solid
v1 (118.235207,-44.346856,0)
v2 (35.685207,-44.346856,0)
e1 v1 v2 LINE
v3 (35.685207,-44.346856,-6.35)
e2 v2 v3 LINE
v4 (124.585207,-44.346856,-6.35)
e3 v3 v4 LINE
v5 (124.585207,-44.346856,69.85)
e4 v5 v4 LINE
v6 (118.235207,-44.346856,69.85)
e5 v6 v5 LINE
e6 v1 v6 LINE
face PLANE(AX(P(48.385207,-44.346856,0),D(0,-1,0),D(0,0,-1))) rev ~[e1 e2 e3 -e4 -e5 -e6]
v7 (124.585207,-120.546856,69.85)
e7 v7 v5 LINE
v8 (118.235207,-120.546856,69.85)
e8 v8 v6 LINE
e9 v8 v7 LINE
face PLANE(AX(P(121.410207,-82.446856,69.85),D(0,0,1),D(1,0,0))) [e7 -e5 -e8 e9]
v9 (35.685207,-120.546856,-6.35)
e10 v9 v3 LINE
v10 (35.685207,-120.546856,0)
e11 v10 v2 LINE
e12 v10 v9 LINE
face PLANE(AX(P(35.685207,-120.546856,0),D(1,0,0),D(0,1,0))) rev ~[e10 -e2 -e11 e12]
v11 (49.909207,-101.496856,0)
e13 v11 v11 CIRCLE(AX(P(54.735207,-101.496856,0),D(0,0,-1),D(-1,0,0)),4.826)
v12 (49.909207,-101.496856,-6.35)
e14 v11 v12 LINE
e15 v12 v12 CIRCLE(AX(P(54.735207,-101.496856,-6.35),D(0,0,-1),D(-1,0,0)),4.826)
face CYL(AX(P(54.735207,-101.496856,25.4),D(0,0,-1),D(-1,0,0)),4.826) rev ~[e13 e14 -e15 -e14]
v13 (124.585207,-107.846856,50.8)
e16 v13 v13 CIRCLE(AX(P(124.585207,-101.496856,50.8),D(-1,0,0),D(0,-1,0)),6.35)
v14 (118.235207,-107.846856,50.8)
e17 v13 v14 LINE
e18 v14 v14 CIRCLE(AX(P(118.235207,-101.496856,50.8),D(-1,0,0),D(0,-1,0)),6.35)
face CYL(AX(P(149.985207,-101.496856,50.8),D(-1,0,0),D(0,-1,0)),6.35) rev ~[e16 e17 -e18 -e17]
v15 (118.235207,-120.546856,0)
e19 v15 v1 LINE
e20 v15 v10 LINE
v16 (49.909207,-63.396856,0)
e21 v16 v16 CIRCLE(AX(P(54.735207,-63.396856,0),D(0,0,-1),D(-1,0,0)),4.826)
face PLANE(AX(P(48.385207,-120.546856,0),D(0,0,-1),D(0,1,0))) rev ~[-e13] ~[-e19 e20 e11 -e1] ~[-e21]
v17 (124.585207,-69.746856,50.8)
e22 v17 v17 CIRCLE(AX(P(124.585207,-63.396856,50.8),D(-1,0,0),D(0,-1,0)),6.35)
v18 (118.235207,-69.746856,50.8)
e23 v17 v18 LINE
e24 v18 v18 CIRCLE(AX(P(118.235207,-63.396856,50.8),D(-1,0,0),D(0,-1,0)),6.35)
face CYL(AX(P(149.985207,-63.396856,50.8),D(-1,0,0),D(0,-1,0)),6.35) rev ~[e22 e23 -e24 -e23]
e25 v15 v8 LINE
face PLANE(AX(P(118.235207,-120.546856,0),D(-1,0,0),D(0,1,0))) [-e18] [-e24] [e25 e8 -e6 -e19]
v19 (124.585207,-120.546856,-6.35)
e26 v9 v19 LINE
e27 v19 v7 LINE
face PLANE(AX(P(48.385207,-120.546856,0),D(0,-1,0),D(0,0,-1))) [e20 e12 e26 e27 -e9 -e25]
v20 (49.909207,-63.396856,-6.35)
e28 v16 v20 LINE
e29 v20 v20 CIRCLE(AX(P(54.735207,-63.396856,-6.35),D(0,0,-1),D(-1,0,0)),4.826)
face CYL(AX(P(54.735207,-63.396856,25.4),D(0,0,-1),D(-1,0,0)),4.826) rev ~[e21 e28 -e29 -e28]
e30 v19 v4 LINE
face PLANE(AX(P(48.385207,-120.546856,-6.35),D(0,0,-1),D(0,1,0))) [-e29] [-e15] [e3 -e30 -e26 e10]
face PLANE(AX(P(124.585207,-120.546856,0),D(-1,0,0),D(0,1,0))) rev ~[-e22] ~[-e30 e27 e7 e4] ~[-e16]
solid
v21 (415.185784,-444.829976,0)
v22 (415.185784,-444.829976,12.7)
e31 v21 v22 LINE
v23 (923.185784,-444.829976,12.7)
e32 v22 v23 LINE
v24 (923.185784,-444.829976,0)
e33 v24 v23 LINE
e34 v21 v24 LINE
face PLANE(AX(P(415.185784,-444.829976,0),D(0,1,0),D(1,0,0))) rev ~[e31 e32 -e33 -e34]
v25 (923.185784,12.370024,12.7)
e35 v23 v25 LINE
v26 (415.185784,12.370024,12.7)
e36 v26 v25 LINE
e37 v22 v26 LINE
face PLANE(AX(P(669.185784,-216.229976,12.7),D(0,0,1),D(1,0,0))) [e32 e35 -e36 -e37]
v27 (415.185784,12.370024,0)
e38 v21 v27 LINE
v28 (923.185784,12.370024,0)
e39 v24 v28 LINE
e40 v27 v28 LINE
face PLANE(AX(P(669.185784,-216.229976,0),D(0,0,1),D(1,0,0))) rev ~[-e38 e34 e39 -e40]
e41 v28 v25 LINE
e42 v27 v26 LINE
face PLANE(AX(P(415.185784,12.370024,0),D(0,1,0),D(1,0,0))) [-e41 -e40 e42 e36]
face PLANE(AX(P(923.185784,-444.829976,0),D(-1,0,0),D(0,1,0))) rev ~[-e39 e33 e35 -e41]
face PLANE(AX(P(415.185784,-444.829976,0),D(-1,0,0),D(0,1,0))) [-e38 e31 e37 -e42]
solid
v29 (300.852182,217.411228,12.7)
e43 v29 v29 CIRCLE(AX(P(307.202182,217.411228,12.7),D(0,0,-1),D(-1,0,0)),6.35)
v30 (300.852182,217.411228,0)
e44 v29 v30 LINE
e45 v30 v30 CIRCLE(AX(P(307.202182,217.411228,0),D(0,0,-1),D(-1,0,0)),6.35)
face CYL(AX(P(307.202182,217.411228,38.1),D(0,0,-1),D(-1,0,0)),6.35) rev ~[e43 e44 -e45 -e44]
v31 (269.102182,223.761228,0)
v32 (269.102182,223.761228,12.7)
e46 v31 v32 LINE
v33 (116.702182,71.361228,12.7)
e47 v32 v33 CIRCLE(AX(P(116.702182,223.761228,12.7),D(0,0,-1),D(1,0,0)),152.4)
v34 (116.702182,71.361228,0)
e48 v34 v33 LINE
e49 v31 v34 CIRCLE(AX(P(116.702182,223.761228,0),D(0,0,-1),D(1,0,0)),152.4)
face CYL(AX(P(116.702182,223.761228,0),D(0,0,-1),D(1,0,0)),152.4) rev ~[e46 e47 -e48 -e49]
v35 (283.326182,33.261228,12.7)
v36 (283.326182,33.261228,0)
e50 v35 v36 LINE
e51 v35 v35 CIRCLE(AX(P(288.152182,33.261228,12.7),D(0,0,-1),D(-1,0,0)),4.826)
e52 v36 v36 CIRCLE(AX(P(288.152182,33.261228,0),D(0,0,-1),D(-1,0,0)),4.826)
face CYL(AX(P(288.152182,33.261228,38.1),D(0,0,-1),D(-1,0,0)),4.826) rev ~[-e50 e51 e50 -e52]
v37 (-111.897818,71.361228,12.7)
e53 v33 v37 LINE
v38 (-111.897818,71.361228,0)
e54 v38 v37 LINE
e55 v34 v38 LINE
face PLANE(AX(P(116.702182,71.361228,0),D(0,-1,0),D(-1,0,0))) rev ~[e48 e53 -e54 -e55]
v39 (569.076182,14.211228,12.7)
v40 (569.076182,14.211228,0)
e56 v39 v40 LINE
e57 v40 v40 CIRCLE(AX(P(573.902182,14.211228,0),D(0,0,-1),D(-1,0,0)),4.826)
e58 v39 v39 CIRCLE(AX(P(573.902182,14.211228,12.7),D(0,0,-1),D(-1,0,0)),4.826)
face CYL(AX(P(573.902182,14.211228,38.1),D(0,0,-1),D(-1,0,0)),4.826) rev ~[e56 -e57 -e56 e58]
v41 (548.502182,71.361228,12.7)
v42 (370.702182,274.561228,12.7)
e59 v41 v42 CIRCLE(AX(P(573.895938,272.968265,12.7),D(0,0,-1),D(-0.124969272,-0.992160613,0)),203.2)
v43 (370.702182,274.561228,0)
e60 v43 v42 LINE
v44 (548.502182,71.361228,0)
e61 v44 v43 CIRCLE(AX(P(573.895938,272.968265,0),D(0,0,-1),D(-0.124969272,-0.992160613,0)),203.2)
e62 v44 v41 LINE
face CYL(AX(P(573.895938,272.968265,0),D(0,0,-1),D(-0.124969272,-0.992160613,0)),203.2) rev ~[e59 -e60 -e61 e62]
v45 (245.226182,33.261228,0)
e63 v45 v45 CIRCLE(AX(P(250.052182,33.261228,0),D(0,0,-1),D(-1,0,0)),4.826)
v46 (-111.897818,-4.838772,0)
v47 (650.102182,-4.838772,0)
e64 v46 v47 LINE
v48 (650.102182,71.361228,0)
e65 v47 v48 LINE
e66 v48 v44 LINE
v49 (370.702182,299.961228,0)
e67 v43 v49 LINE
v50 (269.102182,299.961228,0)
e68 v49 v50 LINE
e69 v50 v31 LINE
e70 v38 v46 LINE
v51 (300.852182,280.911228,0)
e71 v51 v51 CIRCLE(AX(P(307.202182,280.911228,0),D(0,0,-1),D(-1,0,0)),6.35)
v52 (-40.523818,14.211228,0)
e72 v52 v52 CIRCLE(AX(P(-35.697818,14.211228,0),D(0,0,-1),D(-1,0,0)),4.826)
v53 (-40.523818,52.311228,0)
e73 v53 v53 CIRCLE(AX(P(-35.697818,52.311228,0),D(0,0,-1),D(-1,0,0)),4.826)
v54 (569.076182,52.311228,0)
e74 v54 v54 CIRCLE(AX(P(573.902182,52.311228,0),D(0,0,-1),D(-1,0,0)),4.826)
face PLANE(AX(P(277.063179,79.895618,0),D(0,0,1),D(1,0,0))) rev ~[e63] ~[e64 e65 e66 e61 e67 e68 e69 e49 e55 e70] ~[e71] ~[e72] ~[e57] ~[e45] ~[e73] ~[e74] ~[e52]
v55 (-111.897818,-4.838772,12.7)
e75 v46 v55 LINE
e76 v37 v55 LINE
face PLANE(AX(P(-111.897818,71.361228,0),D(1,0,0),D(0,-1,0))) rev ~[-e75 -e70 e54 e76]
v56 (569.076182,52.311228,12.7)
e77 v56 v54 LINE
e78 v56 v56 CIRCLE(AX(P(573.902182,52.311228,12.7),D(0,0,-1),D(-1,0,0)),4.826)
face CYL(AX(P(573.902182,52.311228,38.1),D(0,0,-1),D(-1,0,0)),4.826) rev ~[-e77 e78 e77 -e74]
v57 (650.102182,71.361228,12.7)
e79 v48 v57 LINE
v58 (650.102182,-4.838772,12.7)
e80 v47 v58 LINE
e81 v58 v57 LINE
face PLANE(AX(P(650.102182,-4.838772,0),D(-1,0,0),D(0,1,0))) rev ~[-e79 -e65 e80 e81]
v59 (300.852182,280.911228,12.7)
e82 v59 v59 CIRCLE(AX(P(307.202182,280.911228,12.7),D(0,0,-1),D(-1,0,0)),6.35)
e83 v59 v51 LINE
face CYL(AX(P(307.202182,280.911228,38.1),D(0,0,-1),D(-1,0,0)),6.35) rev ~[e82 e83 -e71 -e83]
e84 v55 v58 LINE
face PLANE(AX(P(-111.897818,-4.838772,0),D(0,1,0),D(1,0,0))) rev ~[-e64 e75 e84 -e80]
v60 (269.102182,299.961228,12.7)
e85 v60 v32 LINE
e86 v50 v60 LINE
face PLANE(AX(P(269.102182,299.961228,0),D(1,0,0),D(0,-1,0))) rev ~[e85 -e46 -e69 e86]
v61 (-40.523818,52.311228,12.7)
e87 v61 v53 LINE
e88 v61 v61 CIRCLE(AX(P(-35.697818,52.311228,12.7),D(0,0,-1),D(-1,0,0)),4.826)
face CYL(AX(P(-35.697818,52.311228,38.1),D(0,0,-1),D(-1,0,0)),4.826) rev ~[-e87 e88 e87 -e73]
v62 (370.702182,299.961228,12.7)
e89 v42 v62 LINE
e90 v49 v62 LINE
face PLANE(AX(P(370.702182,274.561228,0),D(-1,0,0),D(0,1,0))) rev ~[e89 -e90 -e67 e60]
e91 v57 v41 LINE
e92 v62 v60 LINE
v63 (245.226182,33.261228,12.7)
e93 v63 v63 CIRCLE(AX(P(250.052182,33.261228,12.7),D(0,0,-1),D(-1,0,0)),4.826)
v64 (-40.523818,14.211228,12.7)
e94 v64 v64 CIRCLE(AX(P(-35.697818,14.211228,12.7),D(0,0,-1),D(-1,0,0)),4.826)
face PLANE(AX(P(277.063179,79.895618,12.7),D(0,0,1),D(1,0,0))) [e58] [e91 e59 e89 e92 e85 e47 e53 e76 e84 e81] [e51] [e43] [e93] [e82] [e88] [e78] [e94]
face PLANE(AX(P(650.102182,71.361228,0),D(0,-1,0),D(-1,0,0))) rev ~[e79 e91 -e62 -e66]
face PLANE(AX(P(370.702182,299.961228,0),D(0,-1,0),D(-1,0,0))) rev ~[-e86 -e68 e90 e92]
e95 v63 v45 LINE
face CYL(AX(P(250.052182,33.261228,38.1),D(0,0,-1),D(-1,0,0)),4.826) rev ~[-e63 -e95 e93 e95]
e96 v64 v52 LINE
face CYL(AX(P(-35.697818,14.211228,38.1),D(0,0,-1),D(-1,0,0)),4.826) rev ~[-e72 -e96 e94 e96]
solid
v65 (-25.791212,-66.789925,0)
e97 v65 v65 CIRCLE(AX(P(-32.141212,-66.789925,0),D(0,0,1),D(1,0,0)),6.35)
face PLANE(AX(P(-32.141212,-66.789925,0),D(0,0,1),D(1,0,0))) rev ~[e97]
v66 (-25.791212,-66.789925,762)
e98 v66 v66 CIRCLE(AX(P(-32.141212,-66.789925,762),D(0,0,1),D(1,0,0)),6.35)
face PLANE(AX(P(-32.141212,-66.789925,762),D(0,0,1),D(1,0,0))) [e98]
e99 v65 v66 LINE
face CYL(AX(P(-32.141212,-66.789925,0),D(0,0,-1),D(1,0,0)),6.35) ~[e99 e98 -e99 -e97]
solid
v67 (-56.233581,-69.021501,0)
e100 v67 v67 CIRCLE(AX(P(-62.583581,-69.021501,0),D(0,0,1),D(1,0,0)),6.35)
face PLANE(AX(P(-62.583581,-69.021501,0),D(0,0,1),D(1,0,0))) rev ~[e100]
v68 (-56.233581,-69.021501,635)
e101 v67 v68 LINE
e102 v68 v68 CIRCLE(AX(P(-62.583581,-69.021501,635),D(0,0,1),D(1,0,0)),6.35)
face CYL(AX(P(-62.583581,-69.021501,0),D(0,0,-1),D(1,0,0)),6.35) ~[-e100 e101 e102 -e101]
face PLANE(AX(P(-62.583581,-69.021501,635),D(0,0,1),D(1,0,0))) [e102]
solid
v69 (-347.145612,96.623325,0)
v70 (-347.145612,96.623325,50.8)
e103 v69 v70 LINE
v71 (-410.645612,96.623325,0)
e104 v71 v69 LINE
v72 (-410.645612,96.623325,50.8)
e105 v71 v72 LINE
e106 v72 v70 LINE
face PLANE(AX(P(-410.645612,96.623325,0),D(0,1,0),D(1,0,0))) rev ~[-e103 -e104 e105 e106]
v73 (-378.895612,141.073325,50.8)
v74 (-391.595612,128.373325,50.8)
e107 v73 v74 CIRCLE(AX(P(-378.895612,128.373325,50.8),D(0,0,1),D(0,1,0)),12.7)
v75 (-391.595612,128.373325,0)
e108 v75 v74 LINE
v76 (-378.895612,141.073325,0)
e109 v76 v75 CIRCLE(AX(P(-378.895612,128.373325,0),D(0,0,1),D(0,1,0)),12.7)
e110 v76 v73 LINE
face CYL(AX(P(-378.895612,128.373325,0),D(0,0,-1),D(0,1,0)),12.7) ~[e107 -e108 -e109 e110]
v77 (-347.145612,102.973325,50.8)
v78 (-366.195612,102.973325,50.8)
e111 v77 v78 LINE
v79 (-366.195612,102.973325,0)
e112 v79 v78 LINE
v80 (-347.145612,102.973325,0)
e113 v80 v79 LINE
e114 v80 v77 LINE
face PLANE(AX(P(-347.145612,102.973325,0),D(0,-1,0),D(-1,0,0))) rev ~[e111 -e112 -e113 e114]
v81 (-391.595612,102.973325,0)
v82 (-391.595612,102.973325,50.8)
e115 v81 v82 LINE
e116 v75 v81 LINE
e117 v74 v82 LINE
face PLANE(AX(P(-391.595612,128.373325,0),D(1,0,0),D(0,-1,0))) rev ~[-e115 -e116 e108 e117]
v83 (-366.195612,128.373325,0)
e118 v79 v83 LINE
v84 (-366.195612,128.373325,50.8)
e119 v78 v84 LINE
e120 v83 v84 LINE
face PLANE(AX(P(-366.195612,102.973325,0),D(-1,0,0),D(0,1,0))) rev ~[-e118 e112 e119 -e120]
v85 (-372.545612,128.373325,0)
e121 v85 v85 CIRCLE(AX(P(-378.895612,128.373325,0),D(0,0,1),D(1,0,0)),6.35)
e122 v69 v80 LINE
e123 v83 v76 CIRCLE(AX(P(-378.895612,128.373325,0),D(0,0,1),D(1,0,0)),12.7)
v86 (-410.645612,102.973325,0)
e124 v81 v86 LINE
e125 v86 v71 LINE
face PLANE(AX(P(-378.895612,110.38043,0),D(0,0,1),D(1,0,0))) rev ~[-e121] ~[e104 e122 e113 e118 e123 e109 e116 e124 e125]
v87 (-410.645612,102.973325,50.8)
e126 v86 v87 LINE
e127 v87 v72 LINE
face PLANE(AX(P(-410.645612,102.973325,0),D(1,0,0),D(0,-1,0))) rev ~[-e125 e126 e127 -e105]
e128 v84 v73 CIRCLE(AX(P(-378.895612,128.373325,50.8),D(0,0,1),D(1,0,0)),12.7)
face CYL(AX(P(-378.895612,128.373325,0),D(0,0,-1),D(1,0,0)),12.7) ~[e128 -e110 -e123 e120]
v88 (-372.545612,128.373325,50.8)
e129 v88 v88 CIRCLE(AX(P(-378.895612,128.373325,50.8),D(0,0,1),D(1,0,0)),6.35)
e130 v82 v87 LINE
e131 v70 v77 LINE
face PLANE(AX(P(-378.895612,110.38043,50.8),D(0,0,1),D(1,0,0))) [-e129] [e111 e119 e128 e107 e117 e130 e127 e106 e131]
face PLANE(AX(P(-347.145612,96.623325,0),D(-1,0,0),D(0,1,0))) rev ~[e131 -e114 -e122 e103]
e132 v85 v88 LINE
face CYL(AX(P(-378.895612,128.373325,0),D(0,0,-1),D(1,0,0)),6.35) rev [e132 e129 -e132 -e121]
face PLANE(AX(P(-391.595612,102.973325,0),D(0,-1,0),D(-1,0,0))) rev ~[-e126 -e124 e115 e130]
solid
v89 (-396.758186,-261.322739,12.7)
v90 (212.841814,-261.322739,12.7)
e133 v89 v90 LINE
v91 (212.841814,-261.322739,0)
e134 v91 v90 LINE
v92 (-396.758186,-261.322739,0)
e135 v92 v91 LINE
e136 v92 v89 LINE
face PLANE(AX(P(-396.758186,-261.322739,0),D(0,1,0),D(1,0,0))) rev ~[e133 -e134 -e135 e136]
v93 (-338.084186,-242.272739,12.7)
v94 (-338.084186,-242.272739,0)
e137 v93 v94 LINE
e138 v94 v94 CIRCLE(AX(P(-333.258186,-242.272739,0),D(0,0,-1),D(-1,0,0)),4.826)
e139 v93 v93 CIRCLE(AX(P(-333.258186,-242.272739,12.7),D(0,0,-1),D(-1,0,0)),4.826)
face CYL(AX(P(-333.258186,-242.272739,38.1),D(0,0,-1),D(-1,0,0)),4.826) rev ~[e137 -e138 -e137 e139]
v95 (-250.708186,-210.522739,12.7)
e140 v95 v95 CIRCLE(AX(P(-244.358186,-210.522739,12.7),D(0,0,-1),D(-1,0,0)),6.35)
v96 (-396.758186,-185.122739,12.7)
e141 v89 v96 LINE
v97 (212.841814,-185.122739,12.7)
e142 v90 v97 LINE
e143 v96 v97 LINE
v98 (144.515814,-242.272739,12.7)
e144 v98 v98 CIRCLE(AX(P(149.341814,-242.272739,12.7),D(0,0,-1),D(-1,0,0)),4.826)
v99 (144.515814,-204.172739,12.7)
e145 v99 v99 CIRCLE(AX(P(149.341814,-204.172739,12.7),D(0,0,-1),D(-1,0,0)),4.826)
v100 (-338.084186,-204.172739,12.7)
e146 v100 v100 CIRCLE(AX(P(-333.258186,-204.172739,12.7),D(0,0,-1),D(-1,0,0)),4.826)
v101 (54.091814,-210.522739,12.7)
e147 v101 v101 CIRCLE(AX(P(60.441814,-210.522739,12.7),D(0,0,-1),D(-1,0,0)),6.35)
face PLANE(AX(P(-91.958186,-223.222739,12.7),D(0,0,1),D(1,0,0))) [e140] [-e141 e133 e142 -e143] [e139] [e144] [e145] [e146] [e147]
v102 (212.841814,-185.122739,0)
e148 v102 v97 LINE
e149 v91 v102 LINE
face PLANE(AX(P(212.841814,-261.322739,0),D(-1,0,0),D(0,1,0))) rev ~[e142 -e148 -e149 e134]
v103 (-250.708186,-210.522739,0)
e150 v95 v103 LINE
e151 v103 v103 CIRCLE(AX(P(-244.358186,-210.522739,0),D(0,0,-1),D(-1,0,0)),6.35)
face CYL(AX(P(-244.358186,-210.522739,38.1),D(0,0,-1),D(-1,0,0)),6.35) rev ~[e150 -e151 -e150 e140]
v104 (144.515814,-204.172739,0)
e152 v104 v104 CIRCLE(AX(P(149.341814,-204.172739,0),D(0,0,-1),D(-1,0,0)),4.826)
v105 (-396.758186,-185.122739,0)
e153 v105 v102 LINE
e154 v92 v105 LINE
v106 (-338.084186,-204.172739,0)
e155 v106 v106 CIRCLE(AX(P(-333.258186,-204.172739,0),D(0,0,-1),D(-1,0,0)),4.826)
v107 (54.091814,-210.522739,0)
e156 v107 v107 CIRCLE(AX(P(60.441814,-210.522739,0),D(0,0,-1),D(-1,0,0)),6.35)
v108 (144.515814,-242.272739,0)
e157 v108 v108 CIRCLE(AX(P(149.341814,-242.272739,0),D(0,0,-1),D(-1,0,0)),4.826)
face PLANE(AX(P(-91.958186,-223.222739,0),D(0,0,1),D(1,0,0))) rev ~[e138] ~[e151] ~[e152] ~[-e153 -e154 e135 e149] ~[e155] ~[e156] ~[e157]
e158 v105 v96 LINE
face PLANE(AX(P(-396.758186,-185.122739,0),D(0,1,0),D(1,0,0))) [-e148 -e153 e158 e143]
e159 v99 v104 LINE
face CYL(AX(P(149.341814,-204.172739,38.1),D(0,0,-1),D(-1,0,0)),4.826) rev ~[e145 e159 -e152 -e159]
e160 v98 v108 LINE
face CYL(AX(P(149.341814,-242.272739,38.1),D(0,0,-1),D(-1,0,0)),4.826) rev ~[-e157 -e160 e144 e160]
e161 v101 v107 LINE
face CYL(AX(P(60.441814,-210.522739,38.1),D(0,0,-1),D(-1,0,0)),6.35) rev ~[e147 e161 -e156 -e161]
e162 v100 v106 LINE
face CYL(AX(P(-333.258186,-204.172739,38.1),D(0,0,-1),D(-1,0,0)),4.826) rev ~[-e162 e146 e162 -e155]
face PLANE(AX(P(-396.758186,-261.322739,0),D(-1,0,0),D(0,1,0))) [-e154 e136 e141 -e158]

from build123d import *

# Parameters (mm, degrees)
F0_W      = 609.6
F0_H      = 76.2
F1_DEPTH  = 12.7
F3_DEPTH  = 12.7
F5_D      = 9.652
F5_DEPTH  = 25.4
F5_TIP    = 2.8997533474
F7_D      = 9.652
F7_DEPTH  = 25.4
F7_TIP    = 2.8997533474
F8_D      = 9.652
F8_DEPTH  = 25.4
F8_TIP    = 2.8997533474
F10_D     = 9.652
F10_DEPTH = 25.4
F10_TIP   = 2.8997533474
F12_D     = 12.7
F12_DEPTH = 25.4
F12_TIP   = 3.8154649308
F13_R     = 6.35
F14_DEPTH = 635
F15_D     = 12.7
F15_DEPTH = 25.4
F15_TIP   = 3.8154649308
F16_R     = 6.35
F17_DEPTH = 762
F18_W     = 69.85
F18_H     = 76.2
F18_W_2   = 6.35
F19_DEPTH = 6.35
F20_DEPTH = 69.85
F22_D     = 12.7
F22_DEPTH = 25.4
F22_TIP   = 3.8154649308
F23_D     = 12.7
F23_DEPTH = 25.4
F23_TIP   = 3.8154649308
F24_W     = 508
F24_H     = 457.2
F25_DEPTH = 12.7
F26_R     = 6.35
F27_DEPTH = 50.8
F28_DEPTH = 12.7
F30_D     = 9.652
F30_DEPTH = 25.4
F30_TIP   = 2.8997533474


# Not quite as in the source:
# - a feature names something its author has since deleted; it is built from what else it names


with BuildPart() as f1:
    # F0 (on Top) → F1 (new body)
    with BuildSketch(Plane.XY):
        with Locations((-91.9581856579, -223.2227385089)):
            Rectangle(F0_W, F0_H)
    extrude(amount=F1_DEPTH)

    # F5
    with Locations(Plane.XY.offset(12.7)):
        with Locations((149.3418143421, -242.2727385089), (149.3418143421, -204.1727385089)):
            Hole(F5_D / 2, depth=F5_DEPTH)
            with Locations((0, 0, -(F5_DEPTH + F5_TIP / 2))):  # 118° drill point
                Cone(0, F5_D / 2, F5_TIP, mode=Mode.SUBTRACT)

    # F8
    with Locations(Plane.XY.offset(12.7)):
        with Locations((-333.2581856579, -204.1727385089), (-333.2581856579, -242.2727385089)):
            Hole(F8_D / 2, depth=F8_DEPTH)
            with Locations((0, 0, -(F8_DEPTH + F8_TIP / 2))):  # 118° drill point
                Cone(0, F8_D / 2, F8_TIP, mode=Mode.SUBTRACT)

    # F15
    with Locations(Plane.XY.offset(12.7)):
        with Locations((-244.3581856579, -210.5227385089), (60.4418143421, -210.5227385089)):
            Hole(F15_D / 2, depth=F15_DEPTH)
            with Locations((0, 0, -(F15_DEPTH + F15_TIP / 2))):  # 118° drill point
                Cone(0, F15_D / 2, F15_TIP, mode=Mode.SUBTRACT)


with BuildPart() as f3:
    # F2 (on Top) → F3 (new body)
    with BuildSketch(Plane.XY):
        with BuildLine():
            Line((116.7021817187, 71.3612283528), (-111.8978182813, 71.3612283528))
            Line((-111.8978182813, 71.3612283528), (-111.8978182813, -4.8387716472))
            Line((-111.8978182813, -4.8387716472), (650.1021817187, -4.8387716472))
            Line((650.1021817187, -4.8387716472), (650.1021817187, 71.3612283528))
            Line((650.1021817187, 71.3612283528), (548.5021817187, 71.3612283528))
            ThreePointArc((548.5021817187, 71.3612283528), (420.9723533293, 139.160128512), (370.7021817187, 274.5612283528))
            Line((370.7021817187, 274.5612283528), (370.7021817187, 299.9612283528))
            Line((370.7021817187, 299.9612283528), (269.1021817187, 299.9612283528))
            Line((269.1021817187, 299.9612283528), (269.1021817187, 223.7612283528))
            ThreePointArc((269.1021817187, 223.7612283528), (224.4652551716, 115.9981549), (116.7021817187, 71.3612283528))
        make_face()
    extrude(amount=F3_DEPTH)

    # F7
    with Locations(Plane.XY.offset(12.7)):
        with Locations((-35.6978182813, 52.3112283528), (-35.6978182813, 14.2112283528), (573.9021817187, 52.3112283528), (573.9021817187, 14.2112283528)):
            Hole(F7_D / 2, depth=F7_DEPTH)
            with Locations((0, 0, -(F7_DEPTH + F7_TIP / 2))):  # 118° drill point
                Cone(0, F7_D / 2, F7_TIP, mode=Mode.SUBTRACT)

    # F10
    with Locations(Plane.XY.offset(12.7)):
        with Locations((288.1521817187, 33.2612283528), (250.0521817187, 33.2612283528)):
            Hole(F10_D / 2, depth=F10_DEPTH)
            with Locations((0, 0, -(F10_DEPTH + F10_TIP / 2))):  # 118° drill point
                Cone(0, F10_D / 2, F10_TIP, mode=Mode.SUBTRACT)

    # F12
    with Locations(Plane.XY.offset(12.7)):
        with Locations((307.2021817187, 217.4112283528)):
            Hole(F12_D / 2, depth=F12_DEPTH)
            with Locations((0, 0, -(F12_DEPTH + F12_TIP / 2))):  # 118° drill point
                Cone(0, F12_D / 2, F12_TIP, mode=Mode.SUBTRACT)

    # F23
    with Locations(Plane.XY.offset(12.7)):
        with Locations((307.2021817187, 280.9112283528)):
            Hole(F23_D / 2, depth=F23_DEPTH)
            with Locations((0, 0, -(F23_DEPTH + F23_TIP / 2))):  # 118° drill point
                Cone(0, F23_D / 2, F23_TIP, mode=Mode.SUBTRACT)


with BuildPart() as f14:
    # F13 (on Top) → F14 (new body)
    with BuildSketch(Plane.XY):
        with Locations((-62.5835806131, -69.0215006471)):
            Circle(F13_R)
    extrude(amount=F14_DEPTH)


with BuildPart() as f17:
    # F16 (on Top) → F17 (new body)
    with BuildSketch(Plane.XY):
        with Locations((-32.141212374, -66.7899250984)):
            Circle(F16_R)
    extrude(amount=F17_DEPTH)


with BuildPart() as f19:
    # F18 (on Top) → F19 (new body)
    with BuildSketch(Plane.XY):
        with Locations((83.3102070808, -82.4468559648)):
            Rectangle(F18_W, F18_H)
        with Locations((121.4102070808, -82.4468559648)):
            Rectangle(F18_W_2, F18_H)
    extrude(amount=-F19_DEPTH)

    # F18 (on Top) → F20 (join)
    with BuildSketch(Plane.XY):
        with Locations((121.4102070808, -82.4468559648)):
            Rectangle(F18_W_2, F18_H)
    extrude(amount=F20_DEPTH)

    # F22
    with Locations(Plane.YZ.offset(124.5852070808)):
        with Locations((-101.4968559648, 50.8), (-63.3968559648, 50.8)):
            Hole(F22_D / 2, depth=F22_DEPTH)
            with Locations((0, 0, -(F22_DEPTH + F22_TIP / 2))):  # 118° drill point
                Cone(0, F22_D / 2, F22_TIP, mode=Mode.SUBTRACT)

    # F28 (add): a face of the model
    f28_faces = [f19.faces().sort_by_distance(p)[0] for p in [
        (48.3852070808, -82.4468559648, -3.175),
    ]]
    extrude(f28_faces, amount=F28_DEPTH)

    # F30
    with Locations(Plane.XY):
        with Locations((54.7352070808, -63.3968559648), (54.7352070808, -101.4968559648)):
            Hole(F30_D / 2, depth=F30_DEPTH)
            with Locations((0, 0, -(F30_DEPTH + F30_TIP / 2))):  # 118° drill point
                Cone(0, F30_D / 2, F30_TIP, mode=Mode.SUBTRACT)


with BuildPart() as f25:
    # F24 (on Top) → F25 (new body)
    with BuildSketch(Plane.XY):
        with Locations((669.1857836282, -216.2299761653)):
            Rectangle(F24_W, F24_H)
    extrude(amount=F25_DEPTH)


with BuildPart() as f27:
    # F26 (on Top) → F27 (new body)
    with BuildSketch(Plane.XY):
        with BuildLine():
            Line((-410.6456120811, 102.9733254265), (-410.6456120811, 96.6233254265))
            Line((-410.6456120811, 96.6233254265), (-347.1456120811, 96.6233254265))
            Line((-347.1456120811, 96.6233254265), (-347.1456120811, 102.9733254265))
            Line((-347.1456120811, 102.9733254265), (-366.1956120811, 102.9733254265))
            Line((-366.1956120811, 102.9733254265), (-366.1956120811, 128.3733254265))
            ThreePointArc((-366.1956120811, 128.3733254265), (-369.9153559601, 137.3535815476), (-378.8956120811, 141.0733254265))
            ThreePointArc((-378.8956120811, 141.0733254265), (-387.8758682022, 137.3535815476), (-391.5956120811, 128.3733254265))
            Line((-391.5956120811, 128.3733254265), (-391.5956120811, 102.9733254265))
            Line((-391.5956120811, 102.9733254265), (-410.6456120811, 102.9733254265))
        make_face()
        with Locations((-378.8956120811, 128.3733254265)):
            Circle(F26_R, mode=Mode.SUBTRACT)
    extrude(amount=F27_DEPTH)


solid = Compound([f1.part, f3.part, f14.part, f17.part, f19.part, f25.part, f27.part])
